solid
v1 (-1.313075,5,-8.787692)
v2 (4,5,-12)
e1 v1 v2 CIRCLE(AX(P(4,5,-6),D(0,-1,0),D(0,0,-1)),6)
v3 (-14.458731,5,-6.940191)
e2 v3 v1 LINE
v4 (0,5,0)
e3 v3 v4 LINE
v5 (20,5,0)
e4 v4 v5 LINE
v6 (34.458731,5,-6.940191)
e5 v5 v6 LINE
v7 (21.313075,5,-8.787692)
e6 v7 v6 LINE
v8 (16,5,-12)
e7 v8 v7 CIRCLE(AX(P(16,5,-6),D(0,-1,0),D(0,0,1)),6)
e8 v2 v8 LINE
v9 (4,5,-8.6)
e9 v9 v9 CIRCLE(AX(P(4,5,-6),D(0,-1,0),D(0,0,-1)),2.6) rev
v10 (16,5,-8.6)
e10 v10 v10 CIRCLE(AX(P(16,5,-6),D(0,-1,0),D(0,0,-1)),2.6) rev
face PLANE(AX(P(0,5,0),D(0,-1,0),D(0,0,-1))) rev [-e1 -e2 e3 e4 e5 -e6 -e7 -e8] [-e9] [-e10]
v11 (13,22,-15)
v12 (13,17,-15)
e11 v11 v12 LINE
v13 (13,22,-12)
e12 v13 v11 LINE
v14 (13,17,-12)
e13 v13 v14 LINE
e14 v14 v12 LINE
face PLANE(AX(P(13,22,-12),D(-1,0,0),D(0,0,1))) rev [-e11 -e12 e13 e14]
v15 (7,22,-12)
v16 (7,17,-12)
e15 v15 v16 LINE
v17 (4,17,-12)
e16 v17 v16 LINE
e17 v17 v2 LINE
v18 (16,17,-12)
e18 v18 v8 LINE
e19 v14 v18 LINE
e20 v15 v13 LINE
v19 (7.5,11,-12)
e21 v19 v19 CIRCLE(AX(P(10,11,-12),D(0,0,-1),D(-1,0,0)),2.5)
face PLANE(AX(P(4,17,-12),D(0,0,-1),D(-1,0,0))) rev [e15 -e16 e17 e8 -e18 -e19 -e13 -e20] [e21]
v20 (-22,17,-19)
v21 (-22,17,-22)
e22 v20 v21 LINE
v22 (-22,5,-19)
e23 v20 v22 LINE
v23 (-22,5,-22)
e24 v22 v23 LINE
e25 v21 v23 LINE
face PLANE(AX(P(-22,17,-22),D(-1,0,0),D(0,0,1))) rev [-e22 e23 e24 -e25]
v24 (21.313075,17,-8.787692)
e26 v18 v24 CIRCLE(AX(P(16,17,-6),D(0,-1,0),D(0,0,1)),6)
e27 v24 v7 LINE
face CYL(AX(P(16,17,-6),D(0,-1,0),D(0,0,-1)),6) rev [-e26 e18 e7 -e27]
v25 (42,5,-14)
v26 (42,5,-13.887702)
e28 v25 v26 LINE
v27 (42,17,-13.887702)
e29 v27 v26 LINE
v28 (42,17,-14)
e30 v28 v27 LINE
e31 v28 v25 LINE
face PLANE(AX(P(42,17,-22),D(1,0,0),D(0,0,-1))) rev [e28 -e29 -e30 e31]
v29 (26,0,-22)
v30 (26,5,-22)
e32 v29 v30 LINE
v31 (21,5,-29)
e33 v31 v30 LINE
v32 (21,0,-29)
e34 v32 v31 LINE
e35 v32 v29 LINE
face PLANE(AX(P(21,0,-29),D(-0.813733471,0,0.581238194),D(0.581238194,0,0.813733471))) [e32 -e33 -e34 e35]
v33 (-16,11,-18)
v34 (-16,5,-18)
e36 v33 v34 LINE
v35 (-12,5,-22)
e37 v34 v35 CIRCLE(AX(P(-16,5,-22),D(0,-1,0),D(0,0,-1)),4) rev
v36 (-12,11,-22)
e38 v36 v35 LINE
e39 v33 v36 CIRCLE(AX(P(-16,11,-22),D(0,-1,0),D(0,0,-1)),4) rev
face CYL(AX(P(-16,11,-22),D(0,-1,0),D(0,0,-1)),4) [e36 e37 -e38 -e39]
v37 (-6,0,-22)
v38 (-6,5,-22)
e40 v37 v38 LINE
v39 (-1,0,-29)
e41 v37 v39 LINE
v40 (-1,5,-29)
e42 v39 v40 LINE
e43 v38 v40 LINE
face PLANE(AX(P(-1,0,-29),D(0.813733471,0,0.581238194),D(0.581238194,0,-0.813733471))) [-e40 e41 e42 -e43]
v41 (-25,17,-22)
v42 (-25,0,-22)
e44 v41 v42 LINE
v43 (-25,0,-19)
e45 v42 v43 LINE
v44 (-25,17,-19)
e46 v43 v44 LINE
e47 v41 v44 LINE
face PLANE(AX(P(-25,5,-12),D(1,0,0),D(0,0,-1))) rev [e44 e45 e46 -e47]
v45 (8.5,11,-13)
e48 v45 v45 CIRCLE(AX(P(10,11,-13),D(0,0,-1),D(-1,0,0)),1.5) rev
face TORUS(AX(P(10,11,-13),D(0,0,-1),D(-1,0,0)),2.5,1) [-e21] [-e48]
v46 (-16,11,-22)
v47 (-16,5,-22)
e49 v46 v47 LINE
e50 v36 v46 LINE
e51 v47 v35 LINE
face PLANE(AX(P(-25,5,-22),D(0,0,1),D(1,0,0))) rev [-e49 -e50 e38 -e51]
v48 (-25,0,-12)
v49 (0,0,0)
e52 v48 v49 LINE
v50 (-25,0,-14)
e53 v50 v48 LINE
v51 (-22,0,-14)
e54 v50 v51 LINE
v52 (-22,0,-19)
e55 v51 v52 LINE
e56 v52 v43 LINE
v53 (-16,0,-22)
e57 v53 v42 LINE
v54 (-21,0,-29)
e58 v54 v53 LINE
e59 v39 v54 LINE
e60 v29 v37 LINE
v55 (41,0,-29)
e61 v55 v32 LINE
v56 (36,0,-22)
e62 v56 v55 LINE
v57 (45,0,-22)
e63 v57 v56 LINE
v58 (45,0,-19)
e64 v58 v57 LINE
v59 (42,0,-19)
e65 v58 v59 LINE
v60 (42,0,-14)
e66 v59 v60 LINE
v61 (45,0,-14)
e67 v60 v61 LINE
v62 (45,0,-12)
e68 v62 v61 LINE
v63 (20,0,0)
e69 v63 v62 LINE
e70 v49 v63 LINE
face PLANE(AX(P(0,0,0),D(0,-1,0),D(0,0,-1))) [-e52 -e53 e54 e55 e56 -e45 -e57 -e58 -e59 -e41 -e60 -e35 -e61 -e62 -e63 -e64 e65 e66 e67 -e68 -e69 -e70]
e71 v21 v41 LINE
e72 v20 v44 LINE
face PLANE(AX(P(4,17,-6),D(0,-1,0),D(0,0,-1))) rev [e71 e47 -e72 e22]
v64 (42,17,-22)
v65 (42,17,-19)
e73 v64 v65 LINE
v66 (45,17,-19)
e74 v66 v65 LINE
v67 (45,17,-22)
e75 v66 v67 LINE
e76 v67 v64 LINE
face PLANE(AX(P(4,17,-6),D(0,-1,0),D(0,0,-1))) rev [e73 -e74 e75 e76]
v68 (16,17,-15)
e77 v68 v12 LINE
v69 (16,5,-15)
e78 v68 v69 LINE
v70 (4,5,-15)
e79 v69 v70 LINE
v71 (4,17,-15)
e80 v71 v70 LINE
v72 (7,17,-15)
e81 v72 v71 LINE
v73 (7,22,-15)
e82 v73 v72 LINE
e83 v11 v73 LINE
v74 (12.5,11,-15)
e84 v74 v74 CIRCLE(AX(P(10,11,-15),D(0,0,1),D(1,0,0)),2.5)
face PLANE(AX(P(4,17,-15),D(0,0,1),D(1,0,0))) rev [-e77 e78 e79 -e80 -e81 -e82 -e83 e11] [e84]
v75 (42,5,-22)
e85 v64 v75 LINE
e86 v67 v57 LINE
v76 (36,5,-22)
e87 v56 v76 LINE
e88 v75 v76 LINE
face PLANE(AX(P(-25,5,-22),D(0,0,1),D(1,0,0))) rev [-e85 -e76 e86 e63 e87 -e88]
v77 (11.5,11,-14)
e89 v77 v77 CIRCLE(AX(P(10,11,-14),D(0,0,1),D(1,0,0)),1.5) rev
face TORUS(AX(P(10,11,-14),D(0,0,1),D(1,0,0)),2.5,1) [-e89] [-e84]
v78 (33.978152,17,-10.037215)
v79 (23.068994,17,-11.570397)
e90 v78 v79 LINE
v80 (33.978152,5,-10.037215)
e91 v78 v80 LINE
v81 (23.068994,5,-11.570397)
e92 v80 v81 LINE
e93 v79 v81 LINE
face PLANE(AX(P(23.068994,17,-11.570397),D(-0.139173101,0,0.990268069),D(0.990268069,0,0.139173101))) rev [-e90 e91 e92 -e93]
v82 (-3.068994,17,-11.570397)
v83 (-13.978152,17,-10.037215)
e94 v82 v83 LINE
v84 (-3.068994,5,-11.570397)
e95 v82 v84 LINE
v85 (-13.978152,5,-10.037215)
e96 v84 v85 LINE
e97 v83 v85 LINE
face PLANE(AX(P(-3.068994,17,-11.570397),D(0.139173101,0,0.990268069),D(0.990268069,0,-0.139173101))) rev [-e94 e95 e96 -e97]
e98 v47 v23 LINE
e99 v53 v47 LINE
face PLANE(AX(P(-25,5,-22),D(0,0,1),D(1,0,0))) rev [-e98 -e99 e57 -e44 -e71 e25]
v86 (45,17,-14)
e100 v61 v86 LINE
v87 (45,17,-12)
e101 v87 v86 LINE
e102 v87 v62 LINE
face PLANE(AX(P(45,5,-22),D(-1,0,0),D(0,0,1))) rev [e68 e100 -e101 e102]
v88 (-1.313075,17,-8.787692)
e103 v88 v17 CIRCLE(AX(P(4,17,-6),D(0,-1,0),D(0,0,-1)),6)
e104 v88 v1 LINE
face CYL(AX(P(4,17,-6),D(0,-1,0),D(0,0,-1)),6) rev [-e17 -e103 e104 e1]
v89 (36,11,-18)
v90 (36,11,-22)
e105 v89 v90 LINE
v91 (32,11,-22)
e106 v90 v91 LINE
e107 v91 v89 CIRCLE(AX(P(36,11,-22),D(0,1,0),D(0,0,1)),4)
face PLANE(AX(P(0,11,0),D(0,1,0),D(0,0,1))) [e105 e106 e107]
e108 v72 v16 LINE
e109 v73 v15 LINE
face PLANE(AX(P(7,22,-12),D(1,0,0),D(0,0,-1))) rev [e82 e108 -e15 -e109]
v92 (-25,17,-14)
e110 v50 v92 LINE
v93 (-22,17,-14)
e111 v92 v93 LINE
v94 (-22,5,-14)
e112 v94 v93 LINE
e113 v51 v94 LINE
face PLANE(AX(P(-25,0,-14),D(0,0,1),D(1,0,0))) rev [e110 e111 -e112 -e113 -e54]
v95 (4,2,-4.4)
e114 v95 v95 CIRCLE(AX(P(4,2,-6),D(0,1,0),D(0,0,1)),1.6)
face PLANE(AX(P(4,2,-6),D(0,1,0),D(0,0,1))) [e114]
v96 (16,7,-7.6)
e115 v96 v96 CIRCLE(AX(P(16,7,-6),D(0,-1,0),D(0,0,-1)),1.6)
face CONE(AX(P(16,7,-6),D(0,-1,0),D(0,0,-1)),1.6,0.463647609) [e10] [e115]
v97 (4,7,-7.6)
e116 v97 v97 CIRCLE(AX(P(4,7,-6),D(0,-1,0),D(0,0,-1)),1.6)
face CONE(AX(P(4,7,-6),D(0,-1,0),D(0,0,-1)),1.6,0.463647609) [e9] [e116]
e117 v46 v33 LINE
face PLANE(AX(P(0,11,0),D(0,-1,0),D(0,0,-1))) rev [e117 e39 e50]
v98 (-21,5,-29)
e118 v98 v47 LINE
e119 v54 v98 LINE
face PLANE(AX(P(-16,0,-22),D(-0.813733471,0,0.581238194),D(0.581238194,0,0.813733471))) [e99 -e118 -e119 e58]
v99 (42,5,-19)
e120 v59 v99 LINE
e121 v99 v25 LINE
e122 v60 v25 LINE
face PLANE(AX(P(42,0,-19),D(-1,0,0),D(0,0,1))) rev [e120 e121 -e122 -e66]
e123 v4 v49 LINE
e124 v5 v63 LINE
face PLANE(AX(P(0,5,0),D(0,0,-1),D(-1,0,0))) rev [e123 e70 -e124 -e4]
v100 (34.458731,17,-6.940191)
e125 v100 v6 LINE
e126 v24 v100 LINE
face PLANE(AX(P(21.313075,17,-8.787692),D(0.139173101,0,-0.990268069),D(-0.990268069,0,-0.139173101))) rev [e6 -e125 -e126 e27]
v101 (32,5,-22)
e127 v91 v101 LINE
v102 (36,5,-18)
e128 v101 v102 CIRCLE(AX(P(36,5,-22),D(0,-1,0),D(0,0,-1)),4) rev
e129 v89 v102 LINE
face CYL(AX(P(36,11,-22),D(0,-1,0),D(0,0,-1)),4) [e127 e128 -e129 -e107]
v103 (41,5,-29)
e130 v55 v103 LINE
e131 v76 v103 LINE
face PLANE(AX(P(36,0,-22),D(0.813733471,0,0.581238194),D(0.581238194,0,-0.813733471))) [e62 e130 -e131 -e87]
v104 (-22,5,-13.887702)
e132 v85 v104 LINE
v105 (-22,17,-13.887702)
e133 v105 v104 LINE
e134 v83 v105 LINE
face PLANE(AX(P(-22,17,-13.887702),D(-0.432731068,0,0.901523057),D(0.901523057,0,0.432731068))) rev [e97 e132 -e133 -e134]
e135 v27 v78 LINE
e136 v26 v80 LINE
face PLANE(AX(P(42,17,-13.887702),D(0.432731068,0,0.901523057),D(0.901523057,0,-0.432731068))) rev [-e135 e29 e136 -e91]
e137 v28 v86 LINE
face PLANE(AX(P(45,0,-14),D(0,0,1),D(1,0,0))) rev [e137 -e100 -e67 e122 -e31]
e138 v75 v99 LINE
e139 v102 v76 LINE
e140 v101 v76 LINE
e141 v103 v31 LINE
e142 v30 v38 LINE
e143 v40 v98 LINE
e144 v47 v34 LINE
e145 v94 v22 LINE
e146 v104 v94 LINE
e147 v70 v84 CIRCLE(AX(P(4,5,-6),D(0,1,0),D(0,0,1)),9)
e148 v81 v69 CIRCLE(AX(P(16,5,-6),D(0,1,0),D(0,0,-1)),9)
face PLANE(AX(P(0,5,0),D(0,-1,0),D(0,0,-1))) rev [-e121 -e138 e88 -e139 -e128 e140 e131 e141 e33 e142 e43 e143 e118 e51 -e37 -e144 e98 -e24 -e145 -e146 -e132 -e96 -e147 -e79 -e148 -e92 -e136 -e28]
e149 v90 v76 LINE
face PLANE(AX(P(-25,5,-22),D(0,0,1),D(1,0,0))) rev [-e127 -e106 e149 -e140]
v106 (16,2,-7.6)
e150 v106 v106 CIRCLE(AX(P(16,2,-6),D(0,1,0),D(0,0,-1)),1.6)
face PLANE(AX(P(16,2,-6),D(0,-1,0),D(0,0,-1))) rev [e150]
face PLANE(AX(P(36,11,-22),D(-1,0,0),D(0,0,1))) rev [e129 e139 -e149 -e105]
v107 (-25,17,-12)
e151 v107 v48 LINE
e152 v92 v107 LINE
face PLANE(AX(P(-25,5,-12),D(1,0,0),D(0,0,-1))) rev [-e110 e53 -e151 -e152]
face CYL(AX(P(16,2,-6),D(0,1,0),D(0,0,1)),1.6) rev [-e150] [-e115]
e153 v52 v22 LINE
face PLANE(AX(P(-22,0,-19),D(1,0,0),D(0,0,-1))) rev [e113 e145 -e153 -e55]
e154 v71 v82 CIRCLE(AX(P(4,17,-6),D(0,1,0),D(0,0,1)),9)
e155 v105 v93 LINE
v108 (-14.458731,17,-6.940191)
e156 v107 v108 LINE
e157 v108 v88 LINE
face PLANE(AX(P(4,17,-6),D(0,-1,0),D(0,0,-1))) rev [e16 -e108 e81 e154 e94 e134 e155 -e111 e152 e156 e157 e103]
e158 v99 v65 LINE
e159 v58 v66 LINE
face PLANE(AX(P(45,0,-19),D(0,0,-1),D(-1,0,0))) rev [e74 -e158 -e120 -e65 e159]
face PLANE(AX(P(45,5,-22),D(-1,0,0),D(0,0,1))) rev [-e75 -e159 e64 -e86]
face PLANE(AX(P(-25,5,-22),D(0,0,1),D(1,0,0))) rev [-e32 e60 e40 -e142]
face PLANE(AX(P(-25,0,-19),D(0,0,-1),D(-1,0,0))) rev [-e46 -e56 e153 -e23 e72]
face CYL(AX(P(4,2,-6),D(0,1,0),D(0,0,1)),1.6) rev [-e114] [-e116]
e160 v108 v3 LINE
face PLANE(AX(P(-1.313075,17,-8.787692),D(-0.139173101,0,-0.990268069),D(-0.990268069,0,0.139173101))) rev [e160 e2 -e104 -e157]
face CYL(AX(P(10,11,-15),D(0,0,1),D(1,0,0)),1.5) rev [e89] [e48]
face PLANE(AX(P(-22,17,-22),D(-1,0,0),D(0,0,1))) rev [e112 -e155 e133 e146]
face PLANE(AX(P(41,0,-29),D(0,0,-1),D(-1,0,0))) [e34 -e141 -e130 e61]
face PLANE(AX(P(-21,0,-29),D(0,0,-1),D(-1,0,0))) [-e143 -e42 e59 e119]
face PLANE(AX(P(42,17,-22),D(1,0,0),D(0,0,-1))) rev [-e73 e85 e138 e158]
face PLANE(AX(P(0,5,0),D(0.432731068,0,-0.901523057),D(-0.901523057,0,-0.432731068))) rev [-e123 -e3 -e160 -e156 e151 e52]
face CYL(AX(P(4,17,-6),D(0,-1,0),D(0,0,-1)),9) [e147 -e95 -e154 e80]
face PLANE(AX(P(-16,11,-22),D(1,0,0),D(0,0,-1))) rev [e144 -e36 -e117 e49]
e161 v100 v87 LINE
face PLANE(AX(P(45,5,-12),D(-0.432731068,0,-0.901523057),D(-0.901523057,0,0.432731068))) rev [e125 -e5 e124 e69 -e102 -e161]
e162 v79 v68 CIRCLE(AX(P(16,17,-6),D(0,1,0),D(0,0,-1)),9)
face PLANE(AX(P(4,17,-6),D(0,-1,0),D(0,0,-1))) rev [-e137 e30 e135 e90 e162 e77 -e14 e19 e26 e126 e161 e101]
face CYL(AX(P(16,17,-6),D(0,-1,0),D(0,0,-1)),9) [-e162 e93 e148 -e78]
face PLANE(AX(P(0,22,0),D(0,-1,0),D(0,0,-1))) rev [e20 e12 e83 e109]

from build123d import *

# Parameters (mm, degrees)
BOSS_EXTRUDE1_DEPTH = 5
SKETCH2_R           = 1.6
CUT_EXTRUDE1_DEPTH  = 3
BOSS_EXTRUDE2_DEPTH = 12
SKETCH8_R           = 1.5
CUT_EXTRUDE2_DEPTH  = 3
FILLET1_R           = 1
SKETCH9_W           = 6
SKETCH9_H           = 3
BOSS_EXTRUDE3_DEPTH = 5
SKETCH12_W          = 3
SKETCH12_H          = 5
CUT_EXTRUDE4_DEPTH  = 17
SKETCH14_W          = 4
SKETCH14_H          = 4
BOSS_EXTRUDE5_DEPTH = 6
FILLET3_R           = 4
FILLET4_R           = 4
BOSS_EXTRUDE6_DEPTH = 5


with BuildPart() as part:
    # Sketch1 → Boss-Extrude1 (new body)
    with BuildSketch(Plane(origin=(0, 0, 0), x_dir=(1, 0, 0), z_dir=(0, 1, 0))):
        Polygon((0, 0), (20, 0), (45, 12), (45, 22), (-25, 22), (-25, 12), align=None)
    extrude(amount=BOSS_EXTRUDE1_DEPTH)

    # Sketch2 → Cut-Extrude1 (cut)
    with BuildSketch(Plane(origin=(0, 5, 0), x_dir=(1, 0, 0), z_dir=(0, 1, 0))):
        with Locations(Location((4, 6, 0), (0, 0, 270))):
            Circle(SKETCH2_R)
        with Locations(Location((16, 6, 0), (0, 0, 90))):
            Circle(SKETCH2_R)
    extrude(amount=-CUT_EXTRUDE1_DEPTH, mode=Mode.SUBTRACT)

    # Sketch3 → Boss-Extrude2 (add)
    with BuildSketch(Plane(origin=(0, 5, 0), x_dir=(1, 0, 0), z_dir=(0, 1, 0))):
        with BuildLine():
            Line((-1.313075459, 8.787692444), (-14.45873126, 6.940191005))
            Line((-14.45873126, 6.940191005), (-25, 12))
            Line((-25, 12), (-25, 22))
            Line((-25, 22), (-22, 22))
            Line((-22, 22), (-22, 13.88770191))
            Line((-22, 13.88770191), (-13.978151779, 10.037214764))
            Line((-13.978151779, 10.037214764), (-3.068994172, 11.57039688))
            ThreePointArc((-3.068994172, 11.57039688), (0.071487045, 14.097332027), (4, 15))
            Line((4, 15), (16, 15))
            ThreePointArc((16, 15), (19.928512955, 14.097332027), (23.068994172, 11.57039688))
            Line((23.068994172, 11.57039688), (33.978151779, 10.037214764))
            Line((33.978151779, 10.037214764), (42, 13.88770191))
            Line((42, 13.88770191), (42, 22))
            Line((42, 22), (45, 22))
            Line((45, 22), (45, 12))
            Line((45, 12), (34.45873126, 6.940191005))
            Line((34.45873126, 6.940191005), (21.313075459, 8.787692444))
            ThreePointArc((21.313075459, 8.787692444), (19.104339329, 11.134498742), (16, 12))
            Line((16, 12), (4, 12))
            ThreePointArc((4, 12), (0.895660671, 11.134498742), (-1.313075459, 8.787692444))
        make_face()
    extrude(amount=BOSS_EXTRUDE2_DEPTH)

    # Sketch6 → Revolve1 (revolve)
    with BuildSketch(Plane.XY.offset(-6), mode=Mode.PRIVATE) as revolve1_sk:
        Polygon((2.4, 5), (2.4, 7), (1.4, 5), align=None)
    revolve(revolve1_sk.sketch.rotate(Axis((4, 5, -6), (0, 1, 0)), 270), axis=Axis((4, 5, -6), (0, 1, 0)))

    # Sketch7 → Revolve2 (revolve)
    with BuildSketch(Plane.XY.offset(-6), mode=Mode.PRIVATE) as revolve2_sk:
        Polygon((14.4, 5), (14.4, 7), (13.4, 5), align=None)
    revolve(revolve2_sk.sketch.rotate(Axis((16, 5, -6), (0, 1, 0)), 270), axis=Axis((16, 5, -6), (0, 1, 0)))

    # Sketch8 → Cut-Extrude2 (cut)
    with BuildSketch(Plane.XY.offset(-12)):
        with Locations((10, 11)):
            Circle(SKETCH8_R)
    extrude(amount=-CUT_EXTRUDE2_DEPTH, mode=Mode.SUBTRACT)

    # Fillet1
    fillet1_edges = [part.edges().sort_by_distance(p)[0] for p in [
        (8.5, 11, -15),
        (8.5, 11, -12),
    ]]
    fillet(fillet1_edges, radius=FILLET1_R)

    # Sketch9 → Boss-Extrude3 (add)
    with BuildSketch(Plane(origin=(0, 17, 0), x_dir=(1, 0, 0), z_dir=(0, 1, 0))):
        with Locations((10, 13.5)):
            Rectangle(SKETCH9_W, SKETCH9_H)
    extrude(amount=BOSS_EXTRUDE3_DEPTH)

    # Sketch12 → Cut-Extrude4 (cut)
    with BuildSketch(Plane(origin=(0, 17, 0), x_dir=(1, 0, 0), z_dir=(0, 1, 0))):
        with Locations((-23.5, 16.5)):
            Rectangle(SKETCH12_W, SKETCH12_H)
        with Locations((43.5, 16.5)):
            Rectangle(SKETCH12_W, SKETCH12_H)
    extrude(amount=-CUT_EXTRUDE4_DEPTH, mode=Mode.SUBTRACT)

    # Sketch14 → Boss-Extrude5 (add)
    with BuildSketch(Plane(origin=(0, 5, 0), x_dir=(1, 0, 0), z_dir=(0, 1, 0))):
        with Locations((34, 20)):
            Rectangle(SKETCH14_W, SKETCH14_H)
        with Locations((-14, 20)):
            Rectangle(SKETCH14_W, SKETCH14_H)
    extrude(amount=BOSS_EXTRUDE5_DEPTH)

    # Fillet3
    fillet3_edges = [part.edges().sort_by_distance(p)[0] for p in [
        (32, 8, -18),
    ]]
    fillet(fillet3_edges, radius=FILLET3_R - 0.0001)  # a hair under: the kernel refuses the full size

    # Fillet4
    fillet4_edges = [part.edges().sort_by_distance(p)[0] for p in [
        (-12, 8, -18),
    ]]
    fillet(fillet4_edges, radius=FILLET4_R - 0.0001)  # a hair under: the kernel refuses the full size

    # Sketch15 → Boss-Extrude6 (add)
    with BuildSketch(Plane(origin=(0, 5, 0), x_dir=(1, 0, 0), z_dir=(0, 1, 0))):
        Polygon((-16, 22), (-21, 29), (-1, 29), (-6, 22), align=None)
        Polygon((36, 22), (26, 22), (21, 29), (41, 29), align=None)
    extrude(amount=-BOSS_EXTRUDE6_DEPTH)


solid = part.part
